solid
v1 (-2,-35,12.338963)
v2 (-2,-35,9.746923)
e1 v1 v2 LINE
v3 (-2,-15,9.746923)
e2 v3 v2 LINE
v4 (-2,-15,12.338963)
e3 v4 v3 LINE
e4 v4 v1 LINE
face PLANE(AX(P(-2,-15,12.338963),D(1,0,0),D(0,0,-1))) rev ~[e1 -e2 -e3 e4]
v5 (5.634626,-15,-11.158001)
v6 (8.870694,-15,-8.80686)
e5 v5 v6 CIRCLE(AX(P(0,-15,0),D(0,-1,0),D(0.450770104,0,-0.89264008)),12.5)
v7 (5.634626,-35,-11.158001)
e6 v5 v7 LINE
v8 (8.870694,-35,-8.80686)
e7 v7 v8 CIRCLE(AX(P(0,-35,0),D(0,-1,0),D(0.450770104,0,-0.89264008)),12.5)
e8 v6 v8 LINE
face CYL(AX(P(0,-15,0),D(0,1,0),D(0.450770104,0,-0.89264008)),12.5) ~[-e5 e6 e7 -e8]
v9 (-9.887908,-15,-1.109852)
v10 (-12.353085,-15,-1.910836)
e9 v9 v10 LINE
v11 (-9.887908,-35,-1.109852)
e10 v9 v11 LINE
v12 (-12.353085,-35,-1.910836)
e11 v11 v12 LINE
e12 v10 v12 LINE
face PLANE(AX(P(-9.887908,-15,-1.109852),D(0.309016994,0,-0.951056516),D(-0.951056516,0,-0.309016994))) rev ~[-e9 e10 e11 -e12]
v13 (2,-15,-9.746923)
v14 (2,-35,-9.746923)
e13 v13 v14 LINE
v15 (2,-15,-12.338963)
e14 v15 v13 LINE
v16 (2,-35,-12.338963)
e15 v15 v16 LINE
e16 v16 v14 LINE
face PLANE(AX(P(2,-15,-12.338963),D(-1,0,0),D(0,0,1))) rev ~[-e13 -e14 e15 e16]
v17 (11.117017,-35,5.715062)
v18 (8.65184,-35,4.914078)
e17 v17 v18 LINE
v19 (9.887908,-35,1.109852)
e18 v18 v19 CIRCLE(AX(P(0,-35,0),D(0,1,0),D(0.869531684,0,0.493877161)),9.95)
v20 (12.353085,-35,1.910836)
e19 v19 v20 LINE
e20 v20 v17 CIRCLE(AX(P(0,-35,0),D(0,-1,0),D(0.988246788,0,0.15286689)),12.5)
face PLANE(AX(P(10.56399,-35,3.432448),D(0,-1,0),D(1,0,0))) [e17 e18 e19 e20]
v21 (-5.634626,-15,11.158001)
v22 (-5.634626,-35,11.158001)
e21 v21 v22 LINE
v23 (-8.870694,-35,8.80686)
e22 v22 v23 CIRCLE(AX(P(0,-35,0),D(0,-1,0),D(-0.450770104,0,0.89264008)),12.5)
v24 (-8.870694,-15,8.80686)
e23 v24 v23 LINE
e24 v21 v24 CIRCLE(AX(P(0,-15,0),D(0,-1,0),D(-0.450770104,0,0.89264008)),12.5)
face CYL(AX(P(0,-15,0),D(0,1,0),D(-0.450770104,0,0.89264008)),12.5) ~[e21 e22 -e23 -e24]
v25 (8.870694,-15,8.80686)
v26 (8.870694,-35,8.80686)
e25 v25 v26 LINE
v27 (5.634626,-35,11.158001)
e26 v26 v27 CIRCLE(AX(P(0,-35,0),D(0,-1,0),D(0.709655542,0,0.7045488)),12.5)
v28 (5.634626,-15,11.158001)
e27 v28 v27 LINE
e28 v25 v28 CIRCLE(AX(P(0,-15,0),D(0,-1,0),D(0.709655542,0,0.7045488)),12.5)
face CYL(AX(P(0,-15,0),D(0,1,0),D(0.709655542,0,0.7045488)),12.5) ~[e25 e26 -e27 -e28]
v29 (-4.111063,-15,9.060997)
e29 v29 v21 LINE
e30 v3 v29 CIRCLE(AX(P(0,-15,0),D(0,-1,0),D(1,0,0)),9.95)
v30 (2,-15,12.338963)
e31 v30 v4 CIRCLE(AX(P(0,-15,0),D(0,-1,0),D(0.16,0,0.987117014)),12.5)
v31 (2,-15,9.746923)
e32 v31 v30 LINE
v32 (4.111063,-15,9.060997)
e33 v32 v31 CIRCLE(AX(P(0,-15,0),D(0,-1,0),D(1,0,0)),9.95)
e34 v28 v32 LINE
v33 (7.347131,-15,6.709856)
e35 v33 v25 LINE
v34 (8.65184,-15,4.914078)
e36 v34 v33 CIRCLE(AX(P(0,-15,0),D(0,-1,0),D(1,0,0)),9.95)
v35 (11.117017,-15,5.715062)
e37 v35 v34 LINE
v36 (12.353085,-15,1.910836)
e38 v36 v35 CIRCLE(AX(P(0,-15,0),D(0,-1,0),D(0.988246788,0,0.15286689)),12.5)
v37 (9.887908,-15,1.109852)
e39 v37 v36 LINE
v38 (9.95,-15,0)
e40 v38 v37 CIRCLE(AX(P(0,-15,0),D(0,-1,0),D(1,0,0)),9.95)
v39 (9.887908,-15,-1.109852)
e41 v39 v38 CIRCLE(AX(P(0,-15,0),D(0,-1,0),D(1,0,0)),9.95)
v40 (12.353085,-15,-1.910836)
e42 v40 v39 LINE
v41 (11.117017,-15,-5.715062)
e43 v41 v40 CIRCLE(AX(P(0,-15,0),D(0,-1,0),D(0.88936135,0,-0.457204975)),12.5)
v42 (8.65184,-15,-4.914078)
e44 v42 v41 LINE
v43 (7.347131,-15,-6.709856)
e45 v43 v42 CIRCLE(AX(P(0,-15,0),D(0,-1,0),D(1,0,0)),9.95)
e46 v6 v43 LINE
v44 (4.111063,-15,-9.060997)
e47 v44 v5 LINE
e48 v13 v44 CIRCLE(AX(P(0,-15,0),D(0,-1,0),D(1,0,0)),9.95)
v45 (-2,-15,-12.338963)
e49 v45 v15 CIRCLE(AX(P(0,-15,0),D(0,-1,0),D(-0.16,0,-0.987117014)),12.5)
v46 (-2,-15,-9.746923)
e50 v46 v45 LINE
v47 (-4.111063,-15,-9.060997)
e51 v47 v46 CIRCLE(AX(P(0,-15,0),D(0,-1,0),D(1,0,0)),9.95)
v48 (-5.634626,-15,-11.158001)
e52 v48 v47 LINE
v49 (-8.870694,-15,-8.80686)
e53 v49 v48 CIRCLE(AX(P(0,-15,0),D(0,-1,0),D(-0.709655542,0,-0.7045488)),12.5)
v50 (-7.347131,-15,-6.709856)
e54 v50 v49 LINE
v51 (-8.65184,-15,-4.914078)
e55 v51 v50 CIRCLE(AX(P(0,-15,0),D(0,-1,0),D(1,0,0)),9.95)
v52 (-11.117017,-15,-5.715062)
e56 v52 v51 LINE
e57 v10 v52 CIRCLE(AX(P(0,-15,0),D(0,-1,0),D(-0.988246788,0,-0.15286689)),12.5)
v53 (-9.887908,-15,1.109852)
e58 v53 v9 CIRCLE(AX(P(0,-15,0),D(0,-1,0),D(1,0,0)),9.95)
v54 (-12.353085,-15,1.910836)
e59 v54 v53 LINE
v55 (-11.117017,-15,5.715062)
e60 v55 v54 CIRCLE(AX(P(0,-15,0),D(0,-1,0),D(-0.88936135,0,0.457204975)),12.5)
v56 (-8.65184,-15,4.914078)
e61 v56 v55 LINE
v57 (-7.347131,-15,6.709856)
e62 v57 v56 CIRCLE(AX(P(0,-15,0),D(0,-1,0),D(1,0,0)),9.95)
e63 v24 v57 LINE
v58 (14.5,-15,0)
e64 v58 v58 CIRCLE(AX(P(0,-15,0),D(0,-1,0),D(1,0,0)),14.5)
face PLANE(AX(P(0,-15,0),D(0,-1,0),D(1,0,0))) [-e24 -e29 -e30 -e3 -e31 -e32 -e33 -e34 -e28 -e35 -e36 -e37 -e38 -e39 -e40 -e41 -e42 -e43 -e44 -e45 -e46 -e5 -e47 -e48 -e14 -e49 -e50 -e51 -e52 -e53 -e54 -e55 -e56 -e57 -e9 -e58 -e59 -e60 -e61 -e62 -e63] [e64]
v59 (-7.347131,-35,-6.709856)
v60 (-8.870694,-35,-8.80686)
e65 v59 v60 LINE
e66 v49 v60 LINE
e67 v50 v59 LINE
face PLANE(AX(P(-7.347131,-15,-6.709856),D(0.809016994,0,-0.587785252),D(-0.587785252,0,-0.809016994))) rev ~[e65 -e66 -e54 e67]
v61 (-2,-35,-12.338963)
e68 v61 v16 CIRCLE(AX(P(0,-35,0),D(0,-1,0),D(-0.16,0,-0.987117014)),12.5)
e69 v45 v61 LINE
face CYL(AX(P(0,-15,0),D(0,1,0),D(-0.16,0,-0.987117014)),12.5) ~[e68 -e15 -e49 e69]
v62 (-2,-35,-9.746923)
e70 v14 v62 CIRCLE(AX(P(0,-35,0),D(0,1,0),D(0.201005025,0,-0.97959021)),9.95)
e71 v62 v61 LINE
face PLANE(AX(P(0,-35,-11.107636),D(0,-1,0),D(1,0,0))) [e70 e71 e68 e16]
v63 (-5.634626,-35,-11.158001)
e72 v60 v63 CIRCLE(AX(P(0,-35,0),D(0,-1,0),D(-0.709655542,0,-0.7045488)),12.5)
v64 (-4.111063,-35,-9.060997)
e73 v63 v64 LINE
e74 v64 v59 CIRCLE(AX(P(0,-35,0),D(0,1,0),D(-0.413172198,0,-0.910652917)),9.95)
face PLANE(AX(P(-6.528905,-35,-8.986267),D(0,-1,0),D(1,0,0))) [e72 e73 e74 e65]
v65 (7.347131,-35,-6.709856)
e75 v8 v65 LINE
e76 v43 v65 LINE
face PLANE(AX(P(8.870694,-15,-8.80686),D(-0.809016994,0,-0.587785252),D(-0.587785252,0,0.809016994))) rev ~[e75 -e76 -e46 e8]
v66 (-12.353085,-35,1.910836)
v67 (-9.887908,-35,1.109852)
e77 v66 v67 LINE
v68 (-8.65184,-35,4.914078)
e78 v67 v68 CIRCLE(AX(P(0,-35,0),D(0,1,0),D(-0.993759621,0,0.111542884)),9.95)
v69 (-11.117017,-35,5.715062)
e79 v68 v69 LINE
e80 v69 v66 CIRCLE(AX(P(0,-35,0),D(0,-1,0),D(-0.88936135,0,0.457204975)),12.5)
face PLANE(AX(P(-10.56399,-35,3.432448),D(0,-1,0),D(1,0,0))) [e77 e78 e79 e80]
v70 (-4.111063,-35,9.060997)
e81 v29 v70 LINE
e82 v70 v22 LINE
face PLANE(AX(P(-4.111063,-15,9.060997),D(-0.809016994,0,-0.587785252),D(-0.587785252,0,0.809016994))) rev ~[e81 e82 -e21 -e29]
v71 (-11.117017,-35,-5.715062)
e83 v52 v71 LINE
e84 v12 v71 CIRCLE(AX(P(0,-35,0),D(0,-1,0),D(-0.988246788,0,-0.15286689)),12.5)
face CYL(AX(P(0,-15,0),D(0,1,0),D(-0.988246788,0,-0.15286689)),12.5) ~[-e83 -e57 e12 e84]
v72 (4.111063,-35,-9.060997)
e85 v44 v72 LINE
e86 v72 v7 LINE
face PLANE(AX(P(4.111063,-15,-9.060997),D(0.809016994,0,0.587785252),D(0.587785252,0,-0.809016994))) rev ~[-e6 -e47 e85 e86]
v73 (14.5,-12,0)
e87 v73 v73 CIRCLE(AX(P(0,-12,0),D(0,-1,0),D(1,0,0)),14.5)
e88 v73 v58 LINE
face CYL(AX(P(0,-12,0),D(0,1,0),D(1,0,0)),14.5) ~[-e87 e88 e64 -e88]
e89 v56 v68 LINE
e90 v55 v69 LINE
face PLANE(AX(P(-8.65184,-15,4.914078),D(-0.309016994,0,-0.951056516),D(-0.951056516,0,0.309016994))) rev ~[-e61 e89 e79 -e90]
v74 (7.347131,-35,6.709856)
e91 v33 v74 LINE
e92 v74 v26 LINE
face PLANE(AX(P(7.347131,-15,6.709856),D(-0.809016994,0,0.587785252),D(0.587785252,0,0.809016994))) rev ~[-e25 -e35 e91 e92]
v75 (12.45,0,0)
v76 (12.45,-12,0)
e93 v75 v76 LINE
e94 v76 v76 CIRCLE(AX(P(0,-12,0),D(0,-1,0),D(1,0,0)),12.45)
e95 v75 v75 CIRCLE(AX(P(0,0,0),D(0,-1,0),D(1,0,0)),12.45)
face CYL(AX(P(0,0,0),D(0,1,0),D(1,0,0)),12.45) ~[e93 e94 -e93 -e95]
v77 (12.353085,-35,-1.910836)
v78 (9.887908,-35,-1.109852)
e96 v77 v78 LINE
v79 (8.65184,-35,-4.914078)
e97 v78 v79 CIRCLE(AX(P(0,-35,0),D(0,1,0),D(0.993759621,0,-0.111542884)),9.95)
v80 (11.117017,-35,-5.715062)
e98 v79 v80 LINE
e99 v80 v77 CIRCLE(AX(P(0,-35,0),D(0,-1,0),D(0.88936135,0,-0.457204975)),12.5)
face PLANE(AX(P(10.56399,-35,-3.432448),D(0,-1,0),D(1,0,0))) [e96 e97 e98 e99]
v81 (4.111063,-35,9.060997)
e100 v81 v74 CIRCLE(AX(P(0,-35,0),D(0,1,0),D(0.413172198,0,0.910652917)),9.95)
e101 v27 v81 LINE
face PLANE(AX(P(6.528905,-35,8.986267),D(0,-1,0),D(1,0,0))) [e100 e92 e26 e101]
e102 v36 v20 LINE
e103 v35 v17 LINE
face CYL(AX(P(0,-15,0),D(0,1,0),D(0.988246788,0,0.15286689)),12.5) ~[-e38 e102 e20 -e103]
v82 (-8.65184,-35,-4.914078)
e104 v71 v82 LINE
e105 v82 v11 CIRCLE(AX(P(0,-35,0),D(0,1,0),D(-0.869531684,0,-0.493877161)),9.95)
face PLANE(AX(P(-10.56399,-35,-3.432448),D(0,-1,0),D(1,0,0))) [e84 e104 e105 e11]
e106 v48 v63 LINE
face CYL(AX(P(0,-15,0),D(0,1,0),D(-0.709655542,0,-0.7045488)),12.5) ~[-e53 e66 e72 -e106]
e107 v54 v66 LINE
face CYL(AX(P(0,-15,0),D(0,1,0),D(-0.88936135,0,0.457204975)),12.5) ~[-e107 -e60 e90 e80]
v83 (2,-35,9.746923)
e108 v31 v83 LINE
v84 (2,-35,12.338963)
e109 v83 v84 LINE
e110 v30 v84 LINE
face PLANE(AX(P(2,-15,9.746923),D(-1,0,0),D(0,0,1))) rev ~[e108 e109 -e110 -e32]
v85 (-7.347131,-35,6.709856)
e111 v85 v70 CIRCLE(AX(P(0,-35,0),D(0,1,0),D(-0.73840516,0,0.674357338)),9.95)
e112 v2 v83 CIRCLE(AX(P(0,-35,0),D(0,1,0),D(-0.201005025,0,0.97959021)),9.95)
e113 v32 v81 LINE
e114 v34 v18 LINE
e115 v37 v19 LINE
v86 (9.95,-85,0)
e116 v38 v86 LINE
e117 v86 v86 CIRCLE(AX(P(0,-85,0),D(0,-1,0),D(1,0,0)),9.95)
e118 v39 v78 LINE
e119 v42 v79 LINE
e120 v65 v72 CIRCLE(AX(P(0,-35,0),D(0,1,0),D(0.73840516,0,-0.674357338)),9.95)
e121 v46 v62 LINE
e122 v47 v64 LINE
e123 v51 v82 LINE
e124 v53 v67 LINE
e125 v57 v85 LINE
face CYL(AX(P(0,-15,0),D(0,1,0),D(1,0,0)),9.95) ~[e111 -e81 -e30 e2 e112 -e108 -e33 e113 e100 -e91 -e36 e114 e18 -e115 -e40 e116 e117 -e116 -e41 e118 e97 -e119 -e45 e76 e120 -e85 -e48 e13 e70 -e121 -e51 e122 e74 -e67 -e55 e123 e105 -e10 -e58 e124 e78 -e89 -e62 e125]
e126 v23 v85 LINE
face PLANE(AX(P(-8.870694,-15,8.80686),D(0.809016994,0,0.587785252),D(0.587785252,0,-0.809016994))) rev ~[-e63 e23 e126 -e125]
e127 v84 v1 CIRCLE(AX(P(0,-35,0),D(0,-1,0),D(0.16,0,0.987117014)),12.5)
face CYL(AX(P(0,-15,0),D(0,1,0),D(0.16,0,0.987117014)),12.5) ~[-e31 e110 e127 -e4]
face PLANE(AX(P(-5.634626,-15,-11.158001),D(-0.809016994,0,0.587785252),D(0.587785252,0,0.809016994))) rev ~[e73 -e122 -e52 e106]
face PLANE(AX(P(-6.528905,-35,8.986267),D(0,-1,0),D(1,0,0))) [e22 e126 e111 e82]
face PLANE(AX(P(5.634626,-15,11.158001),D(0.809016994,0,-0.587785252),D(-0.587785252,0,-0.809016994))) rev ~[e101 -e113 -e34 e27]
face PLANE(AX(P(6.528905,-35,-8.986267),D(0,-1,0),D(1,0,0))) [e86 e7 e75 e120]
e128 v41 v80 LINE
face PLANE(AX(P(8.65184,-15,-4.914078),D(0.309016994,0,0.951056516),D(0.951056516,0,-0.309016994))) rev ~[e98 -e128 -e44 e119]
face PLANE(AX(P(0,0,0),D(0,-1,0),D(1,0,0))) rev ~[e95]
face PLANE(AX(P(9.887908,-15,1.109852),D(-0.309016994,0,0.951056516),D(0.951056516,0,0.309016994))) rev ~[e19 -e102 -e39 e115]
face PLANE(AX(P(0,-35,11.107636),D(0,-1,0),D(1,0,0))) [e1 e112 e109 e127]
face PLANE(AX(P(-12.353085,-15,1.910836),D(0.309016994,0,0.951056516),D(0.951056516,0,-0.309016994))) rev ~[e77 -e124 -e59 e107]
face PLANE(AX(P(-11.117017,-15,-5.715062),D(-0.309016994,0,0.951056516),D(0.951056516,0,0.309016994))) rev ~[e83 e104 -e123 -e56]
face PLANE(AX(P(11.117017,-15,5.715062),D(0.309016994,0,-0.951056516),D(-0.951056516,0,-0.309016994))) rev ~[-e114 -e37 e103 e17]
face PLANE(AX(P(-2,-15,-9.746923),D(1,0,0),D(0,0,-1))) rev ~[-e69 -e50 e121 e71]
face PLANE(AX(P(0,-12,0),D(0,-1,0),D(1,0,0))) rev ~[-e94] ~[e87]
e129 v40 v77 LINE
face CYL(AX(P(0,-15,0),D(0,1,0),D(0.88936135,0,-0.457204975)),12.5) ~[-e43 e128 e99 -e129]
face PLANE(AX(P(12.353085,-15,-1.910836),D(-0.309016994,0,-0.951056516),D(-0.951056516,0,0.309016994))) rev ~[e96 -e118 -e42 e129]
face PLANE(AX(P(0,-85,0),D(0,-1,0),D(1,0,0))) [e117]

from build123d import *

# Parameters (mm, degrees)
F0_R     = 12.45
F1_DEPTH = 12
F2_R     = 14.5
F3_DEPTH = 3
F4_R     = 9.95
F5_DEPTH = 70
F7_DEPTH = 20


with BuildPart() as f1:
    # F0 (on Front) → F1 (new body)
    with BuildSketch(Plane.XZ):
        Circle(F0_R)
    extrude(amount=F1_DEPTH)

    # F2 (on face) → F3 (join)
    with BuildSketch(Plane.XZ.offset(12)):
        Circle(F2_R)
    extrude(amount=F3_DEPTH)

    # F4 (on face) → F5 (join)
    with BuildSketch(Plane.XZ.offset(15)):
        Circle(F4_R)
    extrude(amount=F5_DEPTH)

    # F6 (on face) → F7 (join)
    with BuildSketch(Plane.XZ.offset(15)):
        with BuildLine():
            Line((2, 9.7469225913), (2, 12.3389626793))
            ThreePointArc((2, 12.3389626793), (0, 12.5), (-2, 12.3389626793))
            Line((-2, 12.3389626793), (-2, 9.7469225913))
            ThreePointArc((-2, 9.7469225913), (0, 9.95), (2, 9.7469225913))
        make_face()
        with BuildLine():
            ThreePointArc((-7.3471313431, 6.7098555146), (-5.8484632603, 8.049719094), (-4.1110633656, 9.0609965238))
            Line((-4.1110633656, 9.0609965238), (-5.6346263027, 11.1580010051))
            ThreePointArc((-5.6346263027, 11.1580010051), (-7.3473156537, 10.1127124297), (-8.8706942802, 8.8068599959))
            Line((-8.8706942802, 8.8068599959), (-7.3471313431, 6.7098555146))
        make_face()
        with BuildLine():
            ThreePointArc((-9.887908233, 1.109851691), (-9.4630123371, 3.074719094), (-8.6518402555, 4.9140777561))
            Line((-8.6518402555, 4.9140777561), (-11.1170168717, 5.7150621934))
            ThreePointArc((-11.1170168717, 5.7150621934), (-11.8882064537, 3.8627124297), (-12.3530848492, 1.9108361283))
            Line((-12.3530848492, 1.9108361283), (-9.887908233, 1.109851691))
        make_face()
        with BuildLine():
            ThreePointArc((-8.6518402555, -4.9140777561), (-9.4630123371, -3.074719094), (-9.887908233, -1.109851691))
            Line((-9.887908233, -1.109851691), (-12.3530848492, -1.9108361283))
            ThreePointArc((-12.3530848492, -1.9108361283), (-11.8882064537, -3.8627124297), (-11.1170168717, -5.7150621934))
            Line((-11.1170168717, -5.7150621934), (-8.6518402555, -4.9140777561))
        make_face()
        with BuildLine():
            ThreePointArc((-4.1110633656, -9.0609965238), (-5.8484632603, -8.049719094), (-7.3471313431, -6.7098555146))
            Line((-7.3471313431, -6.7098555146), (-8.8706942802, -8.8068599959))
            ThreePointArc((-8.8706942802, -8.8068599959), (-7.3473156537, -10.1127124297), (-5.6346263027, -11.1580010051))
            Line((-5.6346263027, -11.1580010051), (-4.1110633656, -9.0609965238))
        make_face()
        with BuildLine():
            ThreePointArc((2, -9.7469225913), (0, -9.95), (-2, -9.7469225913))
            Line((-2, -9.7469225913), (-2, -12.3389626793))
            ThreePointArc((-2, -12.3389626793), (0, -12.5), (2, -12.3389626793))
            Line((2, -12.3389626793), (2, -9.7469225913))
        make_face()
        with BuildLine():
            Line((8.8706942802, -8.8068599959), (7.3471313431, -6.7098555146))
            ThreePointArc((7.3471313431, -6.7098555146), (5.8484632603, -8.049719094), (4.1110633656, -9.0609965238))
            Line((4.1110633656, -9.0609965238), (5.6346263027, -11.1580010051))
            ThreePointArc((5.6346263027, -11.1580010051), (7.3473156537, -10.1127124297), (8.8706942802, -8.8068599959))
        make_face()
        with BuildLine():
            Line((12.3530848492, -1.9108361283), (9.887908233, -1.109851691))
            ThreePointArc((9.887908233, -1.109851691), (9.4630123371, -3.074719094), (8.6518402555, -4.9140777561))
            Line((8.6518402555, -4.9140777561), (11.1170168717, -5.7150621934))
            ThreePointArc((11.1170168717, -5.7150621934), (11.8882064537, -3.8627124297), (12.3530848492, -1.9108361283))
        make_face()
        with BuildLine():
            Line((11.1170168717, 5.7150621934), (8.6518402555, 4.9140777561))
            ThreePointArc((8.6518402555, 4.9140777561), (9.4630123371, 3.074719094), (9.887908233, 1.109851691))
            Line((9.887908233, 1.109851691), (12.3530848492, 1.9108361283))
            ThreePointArc((12.3530848492, 1.9108361283), (11.8882064537, 3.8627124297), (11.1170168717, 5.7150621934))
        make_face()
        with BuildLine():
            Line((5.6346263027, 11.1580010051), (4.1110633656, 9.0609965238))
            ThreePointArc((4.1110633656, 9.0609965238), (5.8484632603, 8.049719094), (7.3471313431, 6.7098555146))
            Line((7.3471313431, 6.7098555146), (8.8706942802, 8.8068599959))
            ThreePointArc((8.8706942802, 8.8068599959), (7.3473156537, 10.1127124297), (5.6346263027, 11.1580010051))
        make_face()
    extrude(amount=F7_DEPTH)


solid = f1.part
